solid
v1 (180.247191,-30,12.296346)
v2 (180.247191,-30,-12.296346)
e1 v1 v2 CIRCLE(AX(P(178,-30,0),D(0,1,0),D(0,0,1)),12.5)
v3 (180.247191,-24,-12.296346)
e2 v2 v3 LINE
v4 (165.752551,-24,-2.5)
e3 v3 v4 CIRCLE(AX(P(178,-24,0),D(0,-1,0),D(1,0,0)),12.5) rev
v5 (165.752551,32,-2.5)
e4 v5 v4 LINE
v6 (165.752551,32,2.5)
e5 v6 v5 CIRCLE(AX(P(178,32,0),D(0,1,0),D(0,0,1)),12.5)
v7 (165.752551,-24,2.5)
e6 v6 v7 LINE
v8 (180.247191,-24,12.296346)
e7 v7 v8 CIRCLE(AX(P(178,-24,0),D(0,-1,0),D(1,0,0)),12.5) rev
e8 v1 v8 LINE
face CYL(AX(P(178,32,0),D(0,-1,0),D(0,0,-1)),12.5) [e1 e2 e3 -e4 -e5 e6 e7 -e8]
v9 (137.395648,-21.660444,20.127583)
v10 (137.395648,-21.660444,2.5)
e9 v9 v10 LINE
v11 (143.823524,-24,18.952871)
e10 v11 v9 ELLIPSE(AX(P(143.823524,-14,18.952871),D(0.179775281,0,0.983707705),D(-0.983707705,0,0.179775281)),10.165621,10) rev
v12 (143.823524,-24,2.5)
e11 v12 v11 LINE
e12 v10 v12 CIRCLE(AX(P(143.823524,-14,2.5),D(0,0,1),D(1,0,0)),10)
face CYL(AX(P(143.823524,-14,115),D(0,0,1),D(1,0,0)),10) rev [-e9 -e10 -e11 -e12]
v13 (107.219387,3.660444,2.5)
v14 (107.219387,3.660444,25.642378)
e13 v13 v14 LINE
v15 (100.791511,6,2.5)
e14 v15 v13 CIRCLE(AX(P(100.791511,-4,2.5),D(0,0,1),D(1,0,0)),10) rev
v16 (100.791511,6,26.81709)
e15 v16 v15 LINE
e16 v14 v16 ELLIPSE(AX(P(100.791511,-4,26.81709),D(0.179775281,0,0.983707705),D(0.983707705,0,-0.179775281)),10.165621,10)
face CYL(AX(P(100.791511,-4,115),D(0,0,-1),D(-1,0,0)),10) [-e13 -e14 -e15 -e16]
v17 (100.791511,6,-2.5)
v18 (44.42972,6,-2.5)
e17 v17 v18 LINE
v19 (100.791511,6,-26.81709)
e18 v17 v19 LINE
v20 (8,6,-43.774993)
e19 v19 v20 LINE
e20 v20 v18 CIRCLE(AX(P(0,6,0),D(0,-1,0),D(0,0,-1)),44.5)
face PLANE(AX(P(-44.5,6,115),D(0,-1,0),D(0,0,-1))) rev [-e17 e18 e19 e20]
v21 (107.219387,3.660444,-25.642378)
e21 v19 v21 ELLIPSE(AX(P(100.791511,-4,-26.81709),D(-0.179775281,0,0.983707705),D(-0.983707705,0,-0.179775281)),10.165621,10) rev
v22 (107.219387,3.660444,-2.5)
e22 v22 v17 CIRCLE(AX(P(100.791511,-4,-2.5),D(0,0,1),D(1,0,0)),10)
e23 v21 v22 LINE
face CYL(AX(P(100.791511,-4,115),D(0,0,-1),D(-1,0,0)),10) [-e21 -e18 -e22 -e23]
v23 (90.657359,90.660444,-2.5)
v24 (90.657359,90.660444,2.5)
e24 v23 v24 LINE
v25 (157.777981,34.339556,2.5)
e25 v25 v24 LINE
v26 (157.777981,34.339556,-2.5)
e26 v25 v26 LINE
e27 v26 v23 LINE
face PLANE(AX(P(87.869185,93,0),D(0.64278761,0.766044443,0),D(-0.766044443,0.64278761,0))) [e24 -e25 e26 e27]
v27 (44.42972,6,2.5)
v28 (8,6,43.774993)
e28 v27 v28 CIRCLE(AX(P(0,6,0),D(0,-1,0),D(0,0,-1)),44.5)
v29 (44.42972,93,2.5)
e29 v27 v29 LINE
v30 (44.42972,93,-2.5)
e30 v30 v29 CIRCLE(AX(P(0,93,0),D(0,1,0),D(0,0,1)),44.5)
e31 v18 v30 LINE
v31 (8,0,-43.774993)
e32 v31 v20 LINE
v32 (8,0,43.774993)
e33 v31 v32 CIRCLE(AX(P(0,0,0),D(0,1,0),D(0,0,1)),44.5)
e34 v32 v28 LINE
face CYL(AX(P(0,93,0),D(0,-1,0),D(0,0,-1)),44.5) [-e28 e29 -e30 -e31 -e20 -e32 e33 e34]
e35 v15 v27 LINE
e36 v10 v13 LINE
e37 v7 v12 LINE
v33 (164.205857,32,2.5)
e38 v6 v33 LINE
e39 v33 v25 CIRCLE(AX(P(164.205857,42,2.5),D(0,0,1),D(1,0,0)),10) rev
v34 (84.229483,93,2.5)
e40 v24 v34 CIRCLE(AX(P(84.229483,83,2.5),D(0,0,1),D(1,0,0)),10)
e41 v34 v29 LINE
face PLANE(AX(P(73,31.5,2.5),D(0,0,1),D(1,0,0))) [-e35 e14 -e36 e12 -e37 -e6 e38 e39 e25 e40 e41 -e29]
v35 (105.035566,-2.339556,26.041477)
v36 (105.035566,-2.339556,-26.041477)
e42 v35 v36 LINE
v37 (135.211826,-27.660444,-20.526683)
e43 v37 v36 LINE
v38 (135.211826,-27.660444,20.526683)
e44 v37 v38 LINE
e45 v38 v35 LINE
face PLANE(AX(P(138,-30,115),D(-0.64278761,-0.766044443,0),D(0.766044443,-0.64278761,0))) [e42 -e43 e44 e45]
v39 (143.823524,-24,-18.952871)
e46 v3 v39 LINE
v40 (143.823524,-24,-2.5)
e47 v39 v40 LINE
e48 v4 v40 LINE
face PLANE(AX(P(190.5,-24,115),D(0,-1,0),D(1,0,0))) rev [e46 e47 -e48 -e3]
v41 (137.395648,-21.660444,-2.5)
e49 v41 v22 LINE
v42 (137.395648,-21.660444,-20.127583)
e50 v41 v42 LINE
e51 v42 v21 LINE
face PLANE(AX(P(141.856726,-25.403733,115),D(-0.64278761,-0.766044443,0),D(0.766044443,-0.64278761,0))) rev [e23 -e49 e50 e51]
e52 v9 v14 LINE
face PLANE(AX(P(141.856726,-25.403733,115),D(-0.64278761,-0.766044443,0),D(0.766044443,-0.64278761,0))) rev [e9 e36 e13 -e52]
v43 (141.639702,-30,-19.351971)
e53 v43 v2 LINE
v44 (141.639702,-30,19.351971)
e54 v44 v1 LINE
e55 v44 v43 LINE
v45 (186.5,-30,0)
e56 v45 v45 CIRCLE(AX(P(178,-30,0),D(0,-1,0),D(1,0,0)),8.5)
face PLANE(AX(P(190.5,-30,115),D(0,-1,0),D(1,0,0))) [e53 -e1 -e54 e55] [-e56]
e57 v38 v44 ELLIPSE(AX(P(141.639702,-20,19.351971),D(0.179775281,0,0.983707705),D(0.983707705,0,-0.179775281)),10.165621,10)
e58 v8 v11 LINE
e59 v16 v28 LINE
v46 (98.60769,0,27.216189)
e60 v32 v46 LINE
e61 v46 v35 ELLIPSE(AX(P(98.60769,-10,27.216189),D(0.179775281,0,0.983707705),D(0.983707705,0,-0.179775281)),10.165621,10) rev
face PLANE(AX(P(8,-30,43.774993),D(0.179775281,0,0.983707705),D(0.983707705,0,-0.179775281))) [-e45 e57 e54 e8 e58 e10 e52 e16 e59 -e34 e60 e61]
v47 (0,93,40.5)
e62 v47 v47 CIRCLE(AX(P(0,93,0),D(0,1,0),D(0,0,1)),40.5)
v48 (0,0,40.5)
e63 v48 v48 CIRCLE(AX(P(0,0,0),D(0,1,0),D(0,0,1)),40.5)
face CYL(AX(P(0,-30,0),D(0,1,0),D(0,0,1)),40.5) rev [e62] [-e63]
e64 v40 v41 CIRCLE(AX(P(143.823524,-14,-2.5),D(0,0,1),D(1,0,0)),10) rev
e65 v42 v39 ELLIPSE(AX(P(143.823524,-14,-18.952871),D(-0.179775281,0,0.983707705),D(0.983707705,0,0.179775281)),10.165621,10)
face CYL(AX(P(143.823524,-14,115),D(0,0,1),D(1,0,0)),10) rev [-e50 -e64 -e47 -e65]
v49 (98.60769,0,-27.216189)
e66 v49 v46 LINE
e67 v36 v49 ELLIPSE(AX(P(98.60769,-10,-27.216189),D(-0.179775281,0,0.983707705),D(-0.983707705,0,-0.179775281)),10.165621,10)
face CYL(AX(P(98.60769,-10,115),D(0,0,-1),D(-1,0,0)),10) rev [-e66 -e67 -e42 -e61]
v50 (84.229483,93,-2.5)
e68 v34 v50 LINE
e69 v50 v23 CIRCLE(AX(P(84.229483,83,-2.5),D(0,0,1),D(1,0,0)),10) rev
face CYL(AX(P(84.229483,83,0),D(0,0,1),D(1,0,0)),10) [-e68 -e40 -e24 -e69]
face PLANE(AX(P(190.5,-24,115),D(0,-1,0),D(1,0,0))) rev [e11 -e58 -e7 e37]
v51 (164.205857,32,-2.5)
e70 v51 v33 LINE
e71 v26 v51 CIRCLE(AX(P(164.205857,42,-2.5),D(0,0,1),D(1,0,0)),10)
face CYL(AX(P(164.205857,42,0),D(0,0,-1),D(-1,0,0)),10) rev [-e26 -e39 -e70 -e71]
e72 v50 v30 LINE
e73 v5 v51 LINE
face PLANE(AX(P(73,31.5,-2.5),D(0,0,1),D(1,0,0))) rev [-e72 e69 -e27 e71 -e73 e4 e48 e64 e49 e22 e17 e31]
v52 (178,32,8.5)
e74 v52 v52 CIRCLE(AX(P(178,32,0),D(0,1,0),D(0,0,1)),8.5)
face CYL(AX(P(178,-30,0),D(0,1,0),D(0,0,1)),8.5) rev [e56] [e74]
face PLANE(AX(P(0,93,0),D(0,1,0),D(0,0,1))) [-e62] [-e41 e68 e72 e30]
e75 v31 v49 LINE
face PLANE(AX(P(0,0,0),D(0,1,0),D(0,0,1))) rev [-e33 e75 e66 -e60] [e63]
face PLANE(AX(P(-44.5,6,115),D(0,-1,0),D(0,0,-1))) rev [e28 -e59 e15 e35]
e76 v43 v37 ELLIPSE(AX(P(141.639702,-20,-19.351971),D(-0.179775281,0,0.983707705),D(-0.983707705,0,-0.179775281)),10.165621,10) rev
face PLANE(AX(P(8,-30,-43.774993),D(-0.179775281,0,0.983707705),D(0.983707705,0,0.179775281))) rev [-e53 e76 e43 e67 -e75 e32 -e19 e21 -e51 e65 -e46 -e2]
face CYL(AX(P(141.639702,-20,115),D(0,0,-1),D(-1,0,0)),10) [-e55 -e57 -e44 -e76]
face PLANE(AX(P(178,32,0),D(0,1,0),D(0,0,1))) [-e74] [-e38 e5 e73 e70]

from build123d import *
from build123d.topology import SkipClean

# Parameters (mm, degrees)
SKETCH2_R                = 44.5
BOSS_EXTRUDE1_DEPTH      = 93
BOSS_EXTRUDE2_START      = -30
SKETCH2_3_R              = 12.5
BOSS_EXTRUDE2_DEPTH      = 62
EXTRUDE_THIN1_DEPTH      = 115
CUT_EXTRUDE1_START       = -30
CUT_EXTRUDE1_OUTLINE_R   = 8.5
CUT_EXTRUDE1_OUTLINE_R_2 = 40.5
CUT_EXTRUDE1_DEPTH       = 123
RIB1_START               = -2.5
RIB1_DEPTH               = 5
FILLET1_R                = 10


# Read off the part's stored shape, not the designer's step: Cut-Extrude1, Rib1
with BuildPart() as part:
    # Sketch2 → Boss-Extrude1 (new body)
    with BuildSketch(Plane(origin=(0, 0, 0), x_dir=(1, 0, 0), z_dir=(0, 1, 0))):
        with Locations(Location((0, 0, 0), (0, 0, 90))):
            Circle(SKETCH2_R)
    extrude(amount=BOSS_EXTRUDE1_DEPTH)



with BuildPart() as body_2:
    # Sketch2<3> → Boss-Extrude2 (new body)
    with BuildSketch(Plane(origin=(0, 0, 0), x_dir=(1, 0, 0), z_dir=(0, 1, 0)).offset(BOSS_EXTRUDE2_START)):
        with Locations(Location((178, 0, 0), (0, 0, 270))):
            Circle(SKETCH2_3_R)
    extrude(amount=BOSS_EXTRUDE2_DEPTH)


with BuildPart() as part_1:
    add(part.part)

    add(body_2.part)  # Extrude-Thin1 merges body 2
    # Sketch3 → Extrude-Thin1 (add, symmetric)
    with BuildSketch(Plane.XY):
        Polygon((-44.5, 0), (102.247392222, 0), (138, -30), (190.5, -30), (190.5, -24), (140.183821406, -24), (104.431213628, 6), (-44.5, 6), align=None)
    extrude(amount=EXTRUDE_THIN1_DEPTH, both=True)

    # Cut-Extrude1 outline → Cut-Extrude1 (cut)
    with SkipClean():  # the faces are left unmerged after this step: merging them gives an invalid solid
        with BuildSketch(Plane(origin=(0, 0, 0), x_dir=(1, 0, 0), z_dir=(0, 1, 0)).offset(CUT_EXTRUDE1_START)):
            with Locations((178, 0)):
                Circle(CUT_EXTRUDE1_OUTLINE_R)
            with BuildLine():
                ThreePointArc((-44.5, 0), (-28.497806933, 34.1778437), (8, 43.774992861))
                Line((8, 43.774992861), (180.247191011, 12.296346309))
                ThreePointArc((180.247191011, 12.296346309), (187.600517893, 8.005001948), (190.5, 0))
                Line((190.5, 0), (190.5, 115))
                Line((190.5, 115), (-44.5, 115))
                Line((-44.5, 115), (-44.5, 0))
            make_face()
            with BuildLine():
                ThreePointArc((8, -43.774992861), (-28.497806933, -34.1778437), (-44.5, 0))
                Line((-44.5, 0), (-44.5, -115))
                Line((-44.5, -115), (190.5, -115))
                Line((190.5, -115), (190.5, 0))
                ThreePointArc((190.5, 0), (187.600517893, -8.005001948), (180.247191011, -12.296346309))
                Line((180.247191011, -12.296346309), (8, -43.774992861))
            make_face()
            Circle(CUT_EXTRUDE1_OUTLINE_R_2)
        extrude(amount=CUT_EXTRUDE1_DEPTH, mode=Mode.SUBTRACT)

    # Rib1 outline → Rib1 (add)
    with BuildSketch(Plane.XY.offset(RIB1_START)):
        Polygon((160.566154525, 32), (87.869185376, 93), (43, 93), (43, 6), (104.431213628, 6), (140.183821406, -24), (167, -24), (167, 32), align=None)
    extrude(amount=RIB1_DEPTH)

    # Fillet1
    fillet1_edges = [part_1.edges().sort_by_distance(p)[0] for p in [
        (140.183821406, -24, -11.05901849),
        (104.431213628, 6, -14.325962052),
        (160.566154525, 32, 0),
        (87.869185376, 93, 0),
        (102.247392222, 0, 0),
        (104.431213628, 6, 14.325962052),
        (140.183821406, -24, 11.05901849),
        (138, -30, 0),
    ]]
    fillet(fillet1_edges, radius=FILLET1_R)


solid = part_1.part
